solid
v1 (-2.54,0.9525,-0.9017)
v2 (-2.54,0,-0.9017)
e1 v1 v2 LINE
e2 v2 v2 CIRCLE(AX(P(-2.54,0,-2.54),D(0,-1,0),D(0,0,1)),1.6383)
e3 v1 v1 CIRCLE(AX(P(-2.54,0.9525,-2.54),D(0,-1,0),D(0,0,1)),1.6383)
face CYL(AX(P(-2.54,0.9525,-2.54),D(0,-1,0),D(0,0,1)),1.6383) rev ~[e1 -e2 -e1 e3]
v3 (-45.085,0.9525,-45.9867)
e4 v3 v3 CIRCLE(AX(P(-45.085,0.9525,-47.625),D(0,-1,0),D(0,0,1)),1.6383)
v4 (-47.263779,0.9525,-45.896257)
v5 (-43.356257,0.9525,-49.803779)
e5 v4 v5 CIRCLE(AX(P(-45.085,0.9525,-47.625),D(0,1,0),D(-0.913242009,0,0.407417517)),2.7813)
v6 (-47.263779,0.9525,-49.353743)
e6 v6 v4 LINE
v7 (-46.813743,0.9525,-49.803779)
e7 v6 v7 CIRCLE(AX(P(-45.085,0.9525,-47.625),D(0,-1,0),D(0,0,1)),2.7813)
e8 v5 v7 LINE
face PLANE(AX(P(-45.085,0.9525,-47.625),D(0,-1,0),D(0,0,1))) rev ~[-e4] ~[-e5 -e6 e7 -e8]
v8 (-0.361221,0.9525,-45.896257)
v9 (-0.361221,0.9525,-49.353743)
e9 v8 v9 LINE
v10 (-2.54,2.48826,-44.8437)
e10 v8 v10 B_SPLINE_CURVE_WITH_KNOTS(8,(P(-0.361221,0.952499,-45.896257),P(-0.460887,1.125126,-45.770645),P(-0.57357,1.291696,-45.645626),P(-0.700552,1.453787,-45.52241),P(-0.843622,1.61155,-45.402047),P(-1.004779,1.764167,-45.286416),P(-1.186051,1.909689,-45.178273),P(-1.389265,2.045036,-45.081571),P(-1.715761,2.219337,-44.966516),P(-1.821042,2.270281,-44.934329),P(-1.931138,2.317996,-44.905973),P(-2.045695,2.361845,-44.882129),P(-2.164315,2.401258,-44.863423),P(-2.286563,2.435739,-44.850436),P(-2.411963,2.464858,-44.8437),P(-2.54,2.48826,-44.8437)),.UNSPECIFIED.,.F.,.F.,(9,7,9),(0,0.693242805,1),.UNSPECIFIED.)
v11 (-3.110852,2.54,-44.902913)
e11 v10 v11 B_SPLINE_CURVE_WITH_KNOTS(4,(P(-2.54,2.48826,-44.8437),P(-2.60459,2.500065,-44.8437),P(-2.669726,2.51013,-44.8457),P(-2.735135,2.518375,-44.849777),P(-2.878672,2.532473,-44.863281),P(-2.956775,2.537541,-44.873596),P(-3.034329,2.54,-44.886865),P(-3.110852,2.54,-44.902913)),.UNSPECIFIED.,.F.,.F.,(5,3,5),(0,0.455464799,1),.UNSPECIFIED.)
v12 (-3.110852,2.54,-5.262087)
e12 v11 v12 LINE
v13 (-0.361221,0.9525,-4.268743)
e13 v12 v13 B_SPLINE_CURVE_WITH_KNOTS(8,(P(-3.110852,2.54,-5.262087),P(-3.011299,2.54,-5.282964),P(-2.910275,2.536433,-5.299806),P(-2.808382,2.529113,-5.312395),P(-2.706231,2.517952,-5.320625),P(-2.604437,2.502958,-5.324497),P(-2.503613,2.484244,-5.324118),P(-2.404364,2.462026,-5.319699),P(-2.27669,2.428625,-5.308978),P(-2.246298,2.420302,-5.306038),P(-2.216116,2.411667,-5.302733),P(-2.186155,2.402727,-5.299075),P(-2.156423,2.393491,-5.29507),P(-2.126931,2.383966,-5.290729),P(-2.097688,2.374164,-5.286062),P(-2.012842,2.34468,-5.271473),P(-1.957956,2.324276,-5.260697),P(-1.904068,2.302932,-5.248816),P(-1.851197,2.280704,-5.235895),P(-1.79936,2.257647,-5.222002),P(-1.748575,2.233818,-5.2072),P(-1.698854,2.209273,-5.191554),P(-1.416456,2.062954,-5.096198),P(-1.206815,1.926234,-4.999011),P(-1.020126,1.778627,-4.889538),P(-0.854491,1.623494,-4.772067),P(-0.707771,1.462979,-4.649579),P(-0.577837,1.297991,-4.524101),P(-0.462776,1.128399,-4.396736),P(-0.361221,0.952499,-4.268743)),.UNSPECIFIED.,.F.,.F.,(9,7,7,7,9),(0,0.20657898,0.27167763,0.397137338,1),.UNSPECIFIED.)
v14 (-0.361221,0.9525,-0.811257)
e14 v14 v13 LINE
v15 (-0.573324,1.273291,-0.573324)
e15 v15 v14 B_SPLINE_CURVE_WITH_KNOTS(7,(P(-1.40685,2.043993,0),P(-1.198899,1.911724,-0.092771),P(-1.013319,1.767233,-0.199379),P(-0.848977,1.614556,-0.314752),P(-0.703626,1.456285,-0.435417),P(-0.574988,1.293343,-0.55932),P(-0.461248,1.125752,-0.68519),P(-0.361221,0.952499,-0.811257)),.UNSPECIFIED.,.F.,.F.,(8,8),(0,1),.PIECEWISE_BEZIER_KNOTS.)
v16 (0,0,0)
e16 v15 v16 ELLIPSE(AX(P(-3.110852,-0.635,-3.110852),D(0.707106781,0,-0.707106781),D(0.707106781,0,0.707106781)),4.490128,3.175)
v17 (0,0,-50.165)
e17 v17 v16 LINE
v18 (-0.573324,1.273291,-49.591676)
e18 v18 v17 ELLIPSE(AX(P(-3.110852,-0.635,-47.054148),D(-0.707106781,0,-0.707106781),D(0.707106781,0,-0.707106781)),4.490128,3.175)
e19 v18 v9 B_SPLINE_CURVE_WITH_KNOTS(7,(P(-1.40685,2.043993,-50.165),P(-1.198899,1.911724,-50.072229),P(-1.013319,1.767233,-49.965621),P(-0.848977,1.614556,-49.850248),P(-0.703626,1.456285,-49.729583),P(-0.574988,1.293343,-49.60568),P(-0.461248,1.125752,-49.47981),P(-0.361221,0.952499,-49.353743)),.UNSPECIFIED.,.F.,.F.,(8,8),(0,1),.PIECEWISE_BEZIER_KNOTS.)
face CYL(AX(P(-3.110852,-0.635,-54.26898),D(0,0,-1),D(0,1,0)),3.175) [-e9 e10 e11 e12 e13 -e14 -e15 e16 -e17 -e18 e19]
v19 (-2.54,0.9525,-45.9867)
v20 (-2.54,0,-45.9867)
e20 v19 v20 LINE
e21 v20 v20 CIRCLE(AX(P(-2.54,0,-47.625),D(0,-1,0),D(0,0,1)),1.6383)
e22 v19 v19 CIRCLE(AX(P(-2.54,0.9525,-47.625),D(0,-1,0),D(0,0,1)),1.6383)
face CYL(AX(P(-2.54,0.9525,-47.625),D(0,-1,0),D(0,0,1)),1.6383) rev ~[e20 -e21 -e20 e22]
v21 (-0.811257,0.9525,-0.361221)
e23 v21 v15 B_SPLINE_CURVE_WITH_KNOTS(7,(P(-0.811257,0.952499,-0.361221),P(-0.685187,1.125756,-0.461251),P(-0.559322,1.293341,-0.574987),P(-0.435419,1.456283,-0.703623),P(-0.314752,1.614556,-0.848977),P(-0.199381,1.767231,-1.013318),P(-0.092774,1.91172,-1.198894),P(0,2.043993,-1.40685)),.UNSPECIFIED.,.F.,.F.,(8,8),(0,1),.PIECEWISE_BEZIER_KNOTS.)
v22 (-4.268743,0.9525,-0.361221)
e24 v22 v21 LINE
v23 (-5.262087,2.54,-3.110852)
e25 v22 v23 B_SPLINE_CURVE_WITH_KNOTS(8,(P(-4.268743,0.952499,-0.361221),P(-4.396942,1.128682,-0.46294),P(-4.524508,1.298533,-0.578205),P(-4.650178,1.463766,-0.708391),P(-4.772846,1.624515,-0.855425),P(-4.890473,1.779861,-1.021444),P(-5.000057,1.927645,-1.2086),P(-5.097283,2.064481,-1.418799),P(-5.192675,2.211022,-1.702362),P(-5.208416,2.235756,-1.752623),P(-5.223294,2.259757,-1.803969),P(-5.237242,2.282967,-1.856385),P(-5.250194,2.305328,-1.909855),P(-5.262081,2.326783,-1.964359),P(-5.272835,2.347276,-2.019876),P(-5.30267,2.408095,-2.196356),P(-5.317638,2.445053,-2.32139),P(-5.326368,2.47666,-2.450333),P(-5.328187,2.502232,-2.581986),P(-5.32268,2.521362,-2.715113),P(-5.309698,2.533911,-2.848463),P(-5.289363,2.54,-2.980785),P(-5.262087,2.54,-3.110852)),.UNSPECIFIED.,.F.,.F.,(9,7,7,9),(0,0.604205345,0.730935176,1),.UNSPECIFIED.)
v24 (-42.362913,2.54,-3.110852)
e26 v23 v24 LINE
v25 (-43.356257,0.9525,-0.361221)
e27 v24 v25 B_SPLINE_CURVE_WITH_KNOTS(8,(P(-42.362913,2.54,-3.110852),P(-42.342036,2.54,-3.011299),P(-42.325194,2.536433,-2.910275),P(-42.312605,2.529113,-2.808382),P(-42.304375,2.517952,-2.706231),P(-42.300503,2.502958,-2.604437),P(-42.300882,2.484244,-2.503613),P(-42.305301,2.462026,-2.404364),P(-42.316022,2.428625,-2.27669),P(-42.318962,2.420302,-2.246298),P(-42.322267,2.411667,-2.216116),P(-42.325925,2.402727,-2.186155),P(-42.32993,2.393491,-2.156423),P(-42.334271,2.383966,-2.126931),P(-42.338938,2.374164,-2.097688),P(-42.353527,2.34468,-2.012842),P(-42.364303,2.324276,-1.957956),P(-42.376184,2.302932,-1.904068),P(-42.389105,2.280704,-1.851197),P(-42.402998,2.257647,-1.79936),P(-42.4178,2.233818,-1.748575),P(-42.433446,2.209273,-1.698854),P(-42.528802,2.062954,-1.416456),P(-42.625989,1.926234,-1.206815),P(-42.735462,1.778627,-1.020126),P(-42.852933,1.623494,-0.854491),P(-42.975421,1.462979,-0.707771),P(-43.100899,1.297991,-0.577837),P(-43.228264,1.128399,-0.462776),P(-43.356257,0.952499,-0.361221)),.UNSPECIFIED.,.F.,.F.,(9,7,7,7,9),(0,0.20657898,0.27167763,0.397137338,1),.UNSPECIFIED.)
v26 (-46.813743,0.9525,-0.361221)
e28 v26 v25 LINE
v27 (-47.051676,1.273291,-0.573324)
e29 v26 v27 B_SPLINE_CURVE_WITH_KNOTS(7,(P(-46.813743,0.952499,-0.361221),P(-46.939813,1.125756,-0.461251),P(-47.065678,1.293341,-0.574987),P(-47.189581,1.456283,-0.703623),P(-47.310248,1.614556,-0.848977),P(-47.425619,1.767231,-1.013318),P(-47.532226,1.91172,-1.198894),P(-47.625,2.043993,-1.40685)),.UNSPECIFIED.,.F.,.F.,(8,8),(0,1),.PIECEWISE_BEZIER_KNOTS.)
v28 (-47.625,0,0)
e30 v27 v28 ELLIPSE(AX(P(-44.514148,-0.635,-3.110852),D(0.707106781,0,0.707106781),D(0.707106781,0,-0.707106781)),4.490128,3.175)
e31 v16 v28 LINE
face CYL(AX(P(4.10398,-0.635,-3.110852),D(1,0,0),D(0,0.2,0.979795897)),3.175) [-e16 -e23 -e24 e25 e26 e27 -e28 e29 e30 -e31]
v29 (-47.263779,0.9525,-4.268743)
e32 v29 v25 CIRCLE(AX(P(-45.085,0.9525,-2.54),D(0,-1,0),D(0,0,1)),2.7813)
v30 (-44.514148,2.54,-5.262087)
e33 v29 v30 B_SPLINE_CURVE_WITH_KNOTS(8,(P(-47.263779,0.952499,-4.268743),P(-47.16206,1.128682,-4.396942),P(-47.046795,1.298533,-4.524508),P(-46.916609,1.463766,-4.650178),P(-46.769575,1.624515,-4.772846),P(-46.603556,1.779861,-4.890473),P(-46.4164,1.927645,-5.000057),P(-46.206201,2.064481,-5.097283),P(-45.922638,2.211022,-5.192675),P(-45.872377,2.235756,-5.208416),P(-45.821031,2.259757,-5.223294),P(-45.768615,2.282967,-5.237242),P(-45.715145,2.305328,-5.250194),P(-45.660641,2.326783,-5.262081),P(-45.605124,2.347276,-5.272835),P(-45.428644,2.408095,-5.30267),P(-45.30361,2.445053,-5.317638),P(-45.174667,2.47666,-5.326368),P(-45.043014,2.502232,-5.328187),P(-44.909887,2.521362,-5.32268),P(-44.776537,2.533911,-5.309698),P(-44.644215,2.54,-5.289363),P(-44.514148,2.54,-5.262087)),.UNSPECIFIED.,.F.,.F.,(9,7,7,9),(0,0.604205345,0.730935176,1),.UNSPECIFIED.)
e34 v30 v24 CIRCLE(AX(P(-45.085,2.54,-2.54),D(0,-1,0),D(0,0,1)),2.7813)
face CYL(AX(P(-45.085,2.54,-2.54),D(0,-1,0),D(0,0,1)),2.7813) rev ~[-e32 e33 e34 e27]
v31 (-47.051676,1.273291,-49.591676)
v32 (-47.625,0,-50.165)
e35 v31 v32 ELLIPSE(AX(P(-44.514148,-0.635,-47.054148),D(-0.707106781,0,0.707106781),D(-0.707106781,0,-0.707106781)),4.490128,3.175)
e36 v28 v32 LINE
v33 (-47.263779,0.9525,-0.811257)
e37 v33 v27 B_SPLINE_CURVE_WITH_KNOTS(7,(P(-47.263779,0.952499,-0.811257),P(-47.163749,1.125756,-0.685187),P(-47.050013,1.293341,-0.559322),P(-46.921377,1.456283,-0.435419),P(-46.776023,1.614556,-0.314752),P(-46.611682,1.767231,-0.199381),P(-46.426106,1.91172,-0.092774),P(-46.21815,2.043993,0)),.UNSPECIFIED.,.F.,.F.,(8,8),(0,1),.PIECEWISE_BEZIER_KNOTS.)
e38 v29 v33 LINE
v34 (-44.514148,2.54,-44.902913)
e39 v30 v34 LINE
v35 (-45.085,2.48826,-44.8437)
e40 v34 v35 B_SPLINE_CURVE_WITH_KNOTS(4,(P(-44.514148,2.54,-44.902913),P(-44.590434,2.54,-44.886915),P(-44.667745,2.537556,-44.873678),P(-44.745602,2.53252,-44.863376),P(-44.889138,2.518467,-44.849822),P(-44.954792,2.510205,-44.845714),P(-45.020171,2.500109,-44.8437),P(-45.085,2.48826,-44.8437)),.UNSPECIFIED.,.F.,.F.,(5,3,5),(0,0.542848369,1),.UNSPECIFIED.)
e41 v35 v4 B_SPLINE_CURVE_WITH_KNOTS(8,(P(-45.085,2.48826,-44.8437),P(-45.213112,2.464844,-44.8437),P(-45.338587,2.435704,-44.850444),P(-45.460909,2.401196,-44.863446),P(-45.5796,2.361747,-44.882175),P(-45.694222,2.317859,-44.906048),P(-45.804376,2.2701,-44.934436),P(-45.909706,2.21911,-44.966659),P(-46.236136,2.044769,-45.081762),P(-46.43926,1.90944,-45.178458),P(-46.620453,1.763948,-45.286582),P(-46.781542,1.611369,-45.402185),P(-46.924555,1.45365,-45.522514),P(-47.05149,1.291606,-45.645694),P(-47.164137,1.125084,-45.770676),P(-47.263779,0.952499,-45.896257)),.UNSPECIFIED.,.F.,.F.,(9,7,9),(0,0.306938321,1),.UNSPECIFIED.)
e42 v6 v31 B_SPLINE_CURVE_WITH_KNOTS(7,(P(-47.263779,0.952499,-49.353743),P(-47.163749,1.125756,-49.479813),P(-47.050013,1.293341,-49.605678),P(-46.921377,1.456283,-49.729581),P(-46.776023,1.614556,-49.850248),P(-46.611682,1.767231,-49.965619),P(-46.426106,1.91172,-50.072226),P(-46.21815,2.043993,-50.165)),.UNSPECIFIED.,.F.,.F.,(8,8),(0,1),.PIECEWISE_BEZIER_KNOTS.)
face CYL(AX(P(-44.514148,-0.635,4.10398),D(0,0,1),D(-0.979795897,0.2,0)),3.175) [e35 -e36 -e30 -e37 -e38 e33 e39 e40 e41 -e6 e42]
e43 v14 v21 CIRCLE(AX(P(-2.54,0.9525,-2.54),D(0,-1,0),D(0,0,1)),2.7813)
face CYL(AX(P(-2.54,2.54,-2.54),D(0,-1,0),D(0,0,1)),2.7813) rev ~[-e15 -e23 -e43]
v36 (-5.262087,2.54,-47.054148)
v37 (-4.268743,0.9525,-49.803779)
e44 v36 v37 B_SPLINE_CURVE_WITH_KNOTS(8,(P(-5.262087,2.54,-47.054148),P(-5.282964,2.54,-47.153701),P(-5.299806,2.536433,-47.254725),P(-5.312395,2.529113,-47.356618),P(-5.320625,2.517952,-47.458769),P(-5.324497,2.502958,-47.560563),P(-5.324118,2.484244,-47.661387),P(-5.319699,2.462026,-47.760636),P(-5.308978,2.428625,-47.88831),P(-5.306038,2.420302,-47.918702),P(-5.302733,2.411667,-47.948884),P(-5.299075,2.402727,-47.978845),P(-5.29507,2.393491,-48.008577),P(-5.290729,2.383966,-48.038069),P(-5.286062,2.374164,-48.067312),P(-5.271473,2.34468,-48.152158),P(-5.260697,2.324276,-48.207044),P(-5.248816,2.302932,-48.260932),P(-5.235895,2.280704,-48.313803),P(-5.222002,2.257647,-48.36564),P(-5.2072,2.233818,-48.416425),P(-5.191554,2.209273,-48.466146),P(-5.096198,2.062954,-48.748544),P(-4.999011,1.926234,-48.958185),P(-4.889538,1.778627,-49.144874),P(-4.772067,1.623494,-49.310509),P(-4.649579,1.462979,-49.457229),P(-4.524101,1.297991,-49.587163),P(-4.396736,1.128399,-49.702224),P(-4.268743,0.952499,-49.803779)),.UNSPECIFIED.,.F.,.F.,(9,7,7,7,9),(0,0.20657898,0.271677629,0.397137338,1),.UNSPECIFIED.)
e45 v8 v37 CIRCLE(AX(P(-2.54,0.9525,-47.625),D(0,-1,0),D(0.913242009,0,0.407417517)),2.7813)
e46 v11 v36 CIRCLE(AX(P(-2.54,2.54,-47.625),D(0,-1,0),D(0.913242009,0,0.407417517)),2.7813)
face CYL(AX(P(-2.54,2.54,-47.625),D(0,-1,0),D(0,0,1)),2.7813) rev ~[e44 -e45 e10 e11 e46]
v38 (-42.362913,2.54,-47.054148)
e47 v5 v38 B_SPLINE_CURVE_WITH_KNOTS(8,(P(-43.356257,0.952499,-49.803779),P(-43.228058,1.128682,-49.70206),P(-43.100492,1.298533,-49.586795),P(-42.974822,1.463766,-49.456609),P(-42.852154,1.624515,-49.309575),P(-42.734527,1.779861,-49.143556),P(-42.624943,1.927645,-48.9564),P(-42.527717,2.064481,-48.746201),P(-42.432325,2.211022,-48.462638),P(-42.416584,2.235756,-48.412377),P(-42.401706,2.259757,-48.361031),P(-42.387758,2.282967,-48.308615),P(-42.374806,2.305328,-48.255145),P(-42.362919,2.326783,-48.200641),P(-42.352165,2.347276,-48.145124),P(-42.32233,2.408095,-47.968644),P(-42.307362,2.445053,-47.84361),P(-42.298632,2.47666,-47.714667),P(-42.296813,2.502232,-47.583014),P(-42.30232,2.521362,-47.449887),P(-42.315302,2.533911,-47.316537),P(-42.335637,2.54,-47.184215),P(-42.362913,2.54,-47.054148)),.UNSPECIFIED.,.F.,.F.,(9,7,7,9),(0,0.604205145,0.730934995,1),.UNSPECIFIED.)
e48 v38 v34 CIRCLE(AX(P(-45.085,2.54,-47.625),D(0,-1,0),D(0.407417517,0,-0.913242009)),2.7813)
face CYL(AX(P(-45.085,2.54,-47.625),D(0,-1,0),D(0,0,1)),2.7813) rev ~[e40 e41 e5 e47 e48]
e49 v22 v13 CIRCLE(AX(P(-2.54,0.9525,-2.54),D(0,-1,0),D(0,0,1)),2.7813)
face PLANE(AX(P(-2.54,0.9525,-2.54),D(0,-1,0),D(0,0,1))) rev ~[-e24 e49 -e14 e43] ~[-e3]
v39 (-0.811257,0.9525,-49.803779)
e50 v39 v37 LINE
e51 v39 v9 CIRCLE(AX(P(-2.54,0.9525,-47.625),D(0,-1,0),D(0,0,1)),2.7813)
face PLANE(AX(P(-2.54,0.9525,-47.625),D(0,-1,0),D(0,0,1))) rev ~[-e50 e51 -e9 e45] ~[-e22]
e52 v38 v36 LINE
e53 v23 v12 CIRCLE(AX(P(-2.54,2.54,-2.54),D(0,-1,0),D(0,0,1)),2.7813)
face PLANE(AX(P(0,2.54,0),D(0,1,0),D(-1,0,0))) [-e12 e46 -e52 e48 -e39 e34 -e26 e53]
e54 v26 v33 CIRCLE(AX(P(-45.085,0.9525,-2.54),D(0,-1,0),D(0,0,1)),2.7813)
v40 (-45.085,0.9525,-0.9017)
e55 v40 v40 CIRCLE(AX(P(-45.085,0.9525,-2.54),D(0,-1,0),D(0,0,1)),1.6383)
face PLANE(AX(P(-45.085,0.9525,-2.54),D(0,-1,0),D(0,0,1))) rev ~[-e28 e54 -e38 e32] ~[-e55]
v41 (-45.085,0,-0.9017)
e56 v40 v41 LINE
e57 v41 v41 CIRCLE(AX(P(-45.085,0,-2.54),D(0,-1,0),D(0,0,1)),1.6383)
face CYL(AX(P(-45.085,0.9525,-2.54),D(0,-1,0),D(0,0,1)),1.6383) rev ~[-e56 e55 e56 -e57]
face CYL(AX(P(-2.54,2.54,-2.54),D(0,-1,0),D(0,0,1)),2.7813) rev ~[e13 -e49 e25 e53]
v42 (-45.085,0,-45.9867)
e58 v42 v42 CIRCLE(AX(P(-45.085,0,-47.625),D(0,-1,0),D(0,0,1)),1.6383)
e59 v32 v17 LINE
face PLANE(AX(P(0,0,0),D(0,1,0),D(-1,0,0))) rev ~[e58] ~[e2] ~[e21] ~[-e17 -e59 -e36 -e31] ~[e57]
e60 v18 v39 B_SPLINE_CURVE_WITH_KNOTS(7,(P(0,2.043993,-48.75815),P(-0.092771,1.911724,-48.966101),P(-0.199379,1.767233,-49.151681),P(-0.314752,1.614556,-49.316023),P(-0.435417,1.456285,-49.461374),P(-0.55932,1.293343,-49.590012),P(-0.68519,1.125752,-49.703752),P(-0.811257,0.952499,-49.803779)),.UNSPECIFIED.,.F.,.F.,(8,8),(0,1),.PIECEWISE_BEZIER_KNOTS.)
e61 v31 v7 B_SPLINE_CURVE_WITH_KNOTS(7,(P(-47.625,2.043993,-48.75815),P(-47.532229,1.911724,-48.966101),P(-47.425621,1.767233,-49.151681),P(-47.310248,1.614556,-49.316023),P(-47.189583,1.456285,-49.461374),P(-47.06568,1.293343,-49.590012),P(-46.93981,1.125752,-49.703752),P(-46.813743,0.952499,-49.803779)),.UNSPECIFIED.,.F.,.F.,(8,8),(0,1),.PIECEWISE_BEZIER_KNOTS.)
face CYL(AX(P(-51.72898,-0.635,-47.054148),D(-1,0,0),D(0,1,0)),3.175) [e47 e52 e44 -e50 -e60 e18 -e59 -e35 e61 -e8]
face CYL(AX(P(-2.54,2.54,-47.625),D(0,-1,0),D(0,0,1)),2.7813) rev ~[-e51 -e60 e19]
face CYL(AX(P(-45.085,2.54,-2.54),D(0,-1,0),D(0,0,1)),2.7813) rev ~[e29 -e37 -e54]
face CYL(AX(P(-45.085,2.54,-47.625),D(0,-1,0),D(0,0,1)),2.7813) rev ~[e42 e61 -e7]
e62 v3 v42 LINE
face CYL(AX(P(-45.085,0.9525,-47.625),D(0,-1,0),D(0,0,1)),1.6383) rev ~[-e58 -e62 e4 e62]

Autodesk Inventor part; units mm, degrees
ref_plane "YZ Plane" through (0, 0, 0) normal (1, 0, 0) x (0, 1, 0)
ref_plane "XZ Plane" through (0, 0, 0) normal (0, 1, 0) x (-1, 0, 0)
ref_plane "XY Plane" through (0, 0, 0) normal (0, 0, 1) x (1, 0, 0)
sketch "Sketch1" plane through (0, 0, 0) normal (0, 1, 0) x (-1, 0, 0)
  line L0 (0, 0) -> (47.625, 0)
  line L1 (47.625, 0) -> (47.625, -50.165)
  line L2 (47.625, -50.165) -> (0, -50.165)
  line L3 (0, -50.165) -> (0, 0)
  dimension "d0" = 47.625
  dimension "d1" = 50.165
extrude "Extrusion1" add sketch "Sketch1" along normal blind 2.54
sketch "Sketch2" plane through (0, 2.54, 0) normal (0, 1, 0) x (1, 0, 0)
  line L0 (-47.625, 0) -> (0, 0) projected
  line L1 (0, 0) -> (-2.54, 0)
  line L2 (-2.54, 0) -> (-2.54, 2.54)
  line L3 (-2.54, 2.54) -> (0, 2.54)
  line L4 (0, 2.54) -> (0, 0)
  line L5 (0, 0) -> (0, 50.165) projected
  line L6 (0, 50.165) -> (-2.54, 50.165)
  line L7 (-2.54, 50.165) -> (-2.54, 47.625)
  line L8 (-2.54, 47.625) -> (0, 47.625)
  line L9 (0, 47.625) -> (0, 50.165)
  line L10 (-47.625, 50.165) -> (-47.625, 0) projected
  line L11 (-47.625, 50.165) -> (-45.085, 50.165)
  line L12 (-45.085, 50.165) -> (-45.085, 47.625)
  line L13 (-45.085, 47.625) -> (-47.625, 47.625)
  line L14 (-47.625, 47.625) -> (-47.625, 50.165)
  line L15 (-47.625, 0) -> (-45.085, 0)
  line L16 (-45.085, 0) -> (-45.085, 2.54)
  line L17 (-45.085, 2.54) -> (-47.625, 2.54)
  line L18 (-47.625, 2.54) -> (-47.625, 0)
  dimension "d4" = 2.54
  dimension "d5" = 2.54
  dimension "d6" = 2.54
  dimension "d7" = 2.54
hole "Hole1" at (-45.085, 2.54, -47.625) at (-2.54, 2.54, -47.625) at (-2.54, 2.54, -2.54) at (-45.085, 2.54, -2.54) direction (0, -1, 0) diameter 3.2766 depth 7.2771 counterbore diameter 5.5626 counterbore depth 1.5875 clearance for "Socket Head Cap Screw" size "#4" standard "Ansi Unified Screw Threads"
fillet "Fillet1" radius 3.175 4 edges at (-23.8125, 2.54, 0) (0, 2.54, -25.0825) (-23.8125, 2.54, -50.165) (-47.625, 2.54, -25.0825)
properties part number "Lid-SensorHousing"
